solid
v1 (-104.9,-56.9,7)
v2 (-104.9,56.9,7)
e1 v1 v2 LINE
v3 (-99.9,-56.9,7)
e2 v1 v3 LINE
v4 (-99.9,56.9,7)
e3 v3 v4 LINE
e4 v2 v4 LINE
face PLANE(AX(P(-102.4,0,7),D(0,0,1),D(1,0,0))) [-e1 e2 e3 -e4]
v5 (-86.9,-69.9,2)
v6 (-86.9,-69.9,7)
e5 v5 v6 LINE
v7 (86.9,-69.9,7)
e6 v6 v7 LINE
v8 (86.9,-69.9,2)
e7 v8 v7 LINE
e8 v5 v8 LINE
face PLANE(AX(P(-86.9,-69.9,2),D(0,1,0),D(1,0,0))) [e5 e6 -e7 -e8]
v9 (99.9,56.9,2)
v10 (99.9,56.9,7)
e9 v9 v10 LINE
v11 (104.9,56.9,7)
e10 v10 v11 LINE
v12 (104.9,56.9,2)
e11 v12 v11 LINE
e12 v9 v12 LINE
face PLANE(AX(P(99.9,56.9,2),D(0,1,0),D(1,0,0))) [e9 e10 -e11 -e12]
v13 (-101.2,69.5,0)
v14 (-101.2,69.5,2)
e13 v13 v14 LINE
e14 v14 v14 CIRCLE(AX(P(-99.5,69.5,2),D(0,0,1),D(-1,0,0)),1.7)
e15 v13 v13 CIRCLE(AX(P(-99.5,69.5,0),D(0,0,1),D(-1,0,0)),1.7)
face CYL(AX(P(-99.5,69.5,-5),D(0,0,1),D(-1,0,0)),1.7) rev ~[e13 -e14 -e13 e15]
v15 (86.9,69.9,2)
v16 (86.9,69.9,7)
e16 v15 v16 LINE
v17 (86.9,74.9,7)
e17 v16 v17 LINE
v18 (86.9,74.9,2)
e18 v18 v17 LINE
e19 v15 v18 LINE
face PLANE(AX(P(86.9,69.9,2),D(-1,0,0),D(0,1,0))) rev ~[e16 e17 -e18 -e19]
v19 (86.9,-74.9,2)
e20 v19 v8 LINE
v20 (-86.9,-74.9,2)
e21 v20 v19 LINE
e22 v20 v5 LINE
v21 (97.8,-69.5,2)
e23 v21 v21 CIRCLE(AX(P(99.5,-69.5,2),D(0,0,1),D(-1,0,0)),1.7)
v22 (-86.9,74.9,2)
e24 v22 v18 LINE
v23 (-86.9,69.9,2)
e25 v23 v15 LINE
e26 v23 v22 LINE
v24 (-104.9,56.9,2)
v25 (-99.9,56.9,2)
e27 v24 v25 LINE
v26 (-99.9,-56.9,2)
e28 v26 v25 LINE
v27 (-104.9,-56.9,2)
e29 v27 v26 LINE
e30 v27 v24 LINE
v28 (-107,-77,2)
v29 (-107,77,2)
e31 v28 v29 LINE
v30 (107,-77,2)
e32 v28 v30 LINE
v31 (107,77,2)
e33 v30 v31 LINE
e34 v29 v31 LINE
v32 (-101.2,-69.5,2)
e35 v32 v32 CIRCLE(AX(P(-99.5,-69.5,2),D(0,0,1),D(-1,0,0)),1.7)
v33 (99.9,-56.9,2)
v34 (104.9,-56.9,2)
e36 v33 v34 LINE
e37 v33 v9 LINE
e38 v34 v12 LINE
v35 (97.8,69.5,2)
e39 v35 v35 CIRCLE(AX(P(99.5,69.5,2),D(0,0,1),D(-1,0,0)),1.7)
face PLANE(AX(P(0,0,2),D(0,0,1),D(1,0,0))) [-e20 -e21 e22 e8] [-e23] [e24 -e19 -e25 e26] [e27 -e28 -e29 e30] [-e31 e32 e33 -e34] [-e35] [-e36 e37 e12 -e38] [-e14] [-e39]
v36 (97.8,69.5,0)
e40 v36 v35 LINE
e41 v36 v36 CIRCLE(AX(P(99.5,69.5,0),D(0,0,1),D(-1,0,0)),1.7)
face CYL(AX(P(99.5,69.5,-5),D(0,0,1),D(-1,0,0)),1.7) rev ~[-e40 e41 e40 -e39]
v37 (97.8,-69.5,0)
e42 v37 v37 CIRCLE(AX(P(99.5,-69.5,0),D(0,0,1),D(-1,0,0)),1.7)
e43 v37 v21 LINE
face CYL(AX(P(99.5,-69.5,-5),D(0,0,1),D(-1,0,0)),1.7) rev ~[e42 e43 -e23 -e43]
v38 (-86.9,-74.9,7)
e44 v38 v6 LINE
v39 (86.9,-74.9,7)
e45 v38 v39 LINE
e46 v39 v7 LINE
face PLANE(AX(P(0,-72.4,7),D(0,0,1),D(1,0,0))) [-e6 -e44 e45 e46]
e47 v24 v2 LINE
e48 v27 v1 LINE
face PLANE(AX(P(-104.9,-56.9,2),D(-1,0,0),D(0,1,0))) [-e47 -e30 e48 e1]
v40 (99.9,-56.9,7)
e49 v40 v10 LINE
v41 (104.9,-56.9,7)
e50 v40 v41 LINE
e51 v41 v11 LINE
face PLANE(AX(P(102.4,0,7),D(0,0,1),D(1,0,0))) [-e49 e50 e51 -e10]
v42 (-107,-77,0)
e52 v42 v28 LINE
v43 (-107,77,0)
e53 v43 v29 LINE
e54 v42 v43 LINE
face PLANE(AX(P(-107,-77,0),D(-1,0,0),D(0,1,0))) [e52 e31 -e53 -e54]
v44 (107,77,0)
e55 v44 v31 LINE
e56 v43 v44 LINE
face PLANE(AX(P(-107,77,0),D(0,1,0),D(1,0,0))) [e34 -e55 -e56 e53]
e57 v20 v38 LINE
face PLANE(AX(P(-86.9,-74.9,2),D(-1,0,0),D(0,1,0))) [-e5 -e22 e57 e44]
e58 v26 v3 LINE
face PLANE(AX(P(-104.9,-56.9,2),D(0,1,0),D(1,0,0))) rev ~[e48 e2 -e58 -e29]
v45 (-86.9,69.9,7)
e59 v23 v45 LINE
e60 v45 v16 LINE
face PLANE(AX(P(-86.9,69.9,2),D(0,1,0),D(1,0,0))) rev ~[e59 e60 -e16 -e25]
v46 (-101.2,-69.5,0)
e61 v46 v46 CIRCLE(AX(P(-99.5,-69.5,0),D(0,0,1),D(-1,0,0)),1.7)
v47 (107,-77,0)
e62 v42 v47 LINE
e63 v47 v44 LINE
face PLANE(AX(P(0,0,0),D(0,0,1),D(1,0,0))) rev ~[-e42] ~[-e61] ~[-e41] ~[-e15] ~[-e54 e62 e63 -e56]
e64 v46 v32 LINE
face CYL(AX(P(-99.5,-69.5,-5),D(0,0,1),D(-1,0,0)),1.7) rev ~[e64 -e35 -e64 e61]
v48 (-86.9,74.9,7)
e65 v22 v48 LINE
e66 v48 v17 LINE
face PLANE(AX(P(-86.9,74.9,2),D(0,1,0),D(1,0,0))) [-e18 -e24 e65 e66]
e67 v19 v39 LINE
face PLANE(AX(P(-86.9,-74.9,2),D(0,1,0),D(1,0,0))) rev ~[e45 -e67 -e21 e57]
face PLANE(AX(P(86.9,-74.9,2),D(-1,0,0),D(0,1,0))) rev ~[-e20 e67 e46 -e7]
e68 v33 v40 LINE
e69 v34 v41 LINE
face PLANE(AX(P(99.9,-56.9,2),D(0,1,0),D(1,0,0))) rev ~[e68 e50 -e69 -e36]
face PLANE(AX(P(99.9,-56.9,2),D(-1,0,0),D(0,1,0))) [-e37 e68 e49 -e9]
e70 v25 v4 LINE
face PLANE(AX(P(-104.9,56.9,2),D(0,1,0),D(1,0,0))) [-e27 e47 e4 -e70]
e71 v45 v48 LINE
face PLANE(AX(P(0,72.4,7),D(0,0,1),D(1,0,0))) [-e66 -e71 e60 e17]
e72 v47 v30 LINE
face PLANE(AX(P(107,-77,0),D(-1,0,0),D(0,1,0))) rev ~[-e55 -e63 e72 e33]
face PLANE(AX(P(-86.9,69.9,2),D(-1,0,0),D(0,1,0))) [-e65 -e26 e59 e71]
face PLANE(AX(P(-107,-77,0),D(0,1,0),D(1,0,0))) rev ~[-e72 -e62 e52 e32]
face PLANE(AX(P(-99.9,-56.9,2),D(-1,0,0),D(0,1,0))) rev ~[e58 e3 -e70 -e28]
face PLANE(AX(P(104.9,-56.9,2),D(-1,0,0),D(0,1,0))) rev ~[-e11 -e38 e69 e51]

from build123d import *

# Parameters (mm, degrees)
F0_W     = 214
F0_H     = 154
F1_DEPTH = 2
F2_W     = 5
F2_H     = 113.8
F2_W_2   = 173.8
F2_H_2   = 5
F3_DEPTH = 5
F5_D     = 3.4
F5_DEPTH = 5
F5_TIP   = 1.0214630523


# Not quite as in the source:
# - a feature names something its author has since deleted; it is built from what else it names


with BuildPart() as f1:
    # F0 (on Top) → F1 (new body)
    with BuildSketch(Plane.XY):
        Rectangle(F0_W, F0_H)
    extrude(amount=F1_DEPTH)

    # F2 (on face) → F3 (join)
    with BuildSketch(Plane.XY.offset(2)):
        with Locations((-102.4, 0)):
            Rectangle(F2_W, F2_H)
        with Locations((0, 72.4)):
            Rectangle(F2_W_2, F2_H_2)
        with Locations((102.4, 0)):
            Rectangle(F2_W, F2_H)
        with Locations((0, -72.4)):
            Rectangle(F2_W_2, F2_H_2)
    extrude(amount=F3_DEPTH)

    # F5
    with Locations(Plane(origin=(0, 0, 0), x_dir=(1, 0, 0), z_dir=(0, 0, -1))):
        with Locations((-99.5, -69.5), (-99.5, 69.5), (99.5, 69.5), (99.5, -69.5)):
            Hole(F5_D / 2, depth=F5_DEPTH)
            with Locations((0, 0, -(F5_DEPTH + F5_TIP / 2))):  # 118° drill point
                Cone(0, F5_D / 2, F5_TIP, mode=Mode.SUBTRACT)


solid = f1.part
